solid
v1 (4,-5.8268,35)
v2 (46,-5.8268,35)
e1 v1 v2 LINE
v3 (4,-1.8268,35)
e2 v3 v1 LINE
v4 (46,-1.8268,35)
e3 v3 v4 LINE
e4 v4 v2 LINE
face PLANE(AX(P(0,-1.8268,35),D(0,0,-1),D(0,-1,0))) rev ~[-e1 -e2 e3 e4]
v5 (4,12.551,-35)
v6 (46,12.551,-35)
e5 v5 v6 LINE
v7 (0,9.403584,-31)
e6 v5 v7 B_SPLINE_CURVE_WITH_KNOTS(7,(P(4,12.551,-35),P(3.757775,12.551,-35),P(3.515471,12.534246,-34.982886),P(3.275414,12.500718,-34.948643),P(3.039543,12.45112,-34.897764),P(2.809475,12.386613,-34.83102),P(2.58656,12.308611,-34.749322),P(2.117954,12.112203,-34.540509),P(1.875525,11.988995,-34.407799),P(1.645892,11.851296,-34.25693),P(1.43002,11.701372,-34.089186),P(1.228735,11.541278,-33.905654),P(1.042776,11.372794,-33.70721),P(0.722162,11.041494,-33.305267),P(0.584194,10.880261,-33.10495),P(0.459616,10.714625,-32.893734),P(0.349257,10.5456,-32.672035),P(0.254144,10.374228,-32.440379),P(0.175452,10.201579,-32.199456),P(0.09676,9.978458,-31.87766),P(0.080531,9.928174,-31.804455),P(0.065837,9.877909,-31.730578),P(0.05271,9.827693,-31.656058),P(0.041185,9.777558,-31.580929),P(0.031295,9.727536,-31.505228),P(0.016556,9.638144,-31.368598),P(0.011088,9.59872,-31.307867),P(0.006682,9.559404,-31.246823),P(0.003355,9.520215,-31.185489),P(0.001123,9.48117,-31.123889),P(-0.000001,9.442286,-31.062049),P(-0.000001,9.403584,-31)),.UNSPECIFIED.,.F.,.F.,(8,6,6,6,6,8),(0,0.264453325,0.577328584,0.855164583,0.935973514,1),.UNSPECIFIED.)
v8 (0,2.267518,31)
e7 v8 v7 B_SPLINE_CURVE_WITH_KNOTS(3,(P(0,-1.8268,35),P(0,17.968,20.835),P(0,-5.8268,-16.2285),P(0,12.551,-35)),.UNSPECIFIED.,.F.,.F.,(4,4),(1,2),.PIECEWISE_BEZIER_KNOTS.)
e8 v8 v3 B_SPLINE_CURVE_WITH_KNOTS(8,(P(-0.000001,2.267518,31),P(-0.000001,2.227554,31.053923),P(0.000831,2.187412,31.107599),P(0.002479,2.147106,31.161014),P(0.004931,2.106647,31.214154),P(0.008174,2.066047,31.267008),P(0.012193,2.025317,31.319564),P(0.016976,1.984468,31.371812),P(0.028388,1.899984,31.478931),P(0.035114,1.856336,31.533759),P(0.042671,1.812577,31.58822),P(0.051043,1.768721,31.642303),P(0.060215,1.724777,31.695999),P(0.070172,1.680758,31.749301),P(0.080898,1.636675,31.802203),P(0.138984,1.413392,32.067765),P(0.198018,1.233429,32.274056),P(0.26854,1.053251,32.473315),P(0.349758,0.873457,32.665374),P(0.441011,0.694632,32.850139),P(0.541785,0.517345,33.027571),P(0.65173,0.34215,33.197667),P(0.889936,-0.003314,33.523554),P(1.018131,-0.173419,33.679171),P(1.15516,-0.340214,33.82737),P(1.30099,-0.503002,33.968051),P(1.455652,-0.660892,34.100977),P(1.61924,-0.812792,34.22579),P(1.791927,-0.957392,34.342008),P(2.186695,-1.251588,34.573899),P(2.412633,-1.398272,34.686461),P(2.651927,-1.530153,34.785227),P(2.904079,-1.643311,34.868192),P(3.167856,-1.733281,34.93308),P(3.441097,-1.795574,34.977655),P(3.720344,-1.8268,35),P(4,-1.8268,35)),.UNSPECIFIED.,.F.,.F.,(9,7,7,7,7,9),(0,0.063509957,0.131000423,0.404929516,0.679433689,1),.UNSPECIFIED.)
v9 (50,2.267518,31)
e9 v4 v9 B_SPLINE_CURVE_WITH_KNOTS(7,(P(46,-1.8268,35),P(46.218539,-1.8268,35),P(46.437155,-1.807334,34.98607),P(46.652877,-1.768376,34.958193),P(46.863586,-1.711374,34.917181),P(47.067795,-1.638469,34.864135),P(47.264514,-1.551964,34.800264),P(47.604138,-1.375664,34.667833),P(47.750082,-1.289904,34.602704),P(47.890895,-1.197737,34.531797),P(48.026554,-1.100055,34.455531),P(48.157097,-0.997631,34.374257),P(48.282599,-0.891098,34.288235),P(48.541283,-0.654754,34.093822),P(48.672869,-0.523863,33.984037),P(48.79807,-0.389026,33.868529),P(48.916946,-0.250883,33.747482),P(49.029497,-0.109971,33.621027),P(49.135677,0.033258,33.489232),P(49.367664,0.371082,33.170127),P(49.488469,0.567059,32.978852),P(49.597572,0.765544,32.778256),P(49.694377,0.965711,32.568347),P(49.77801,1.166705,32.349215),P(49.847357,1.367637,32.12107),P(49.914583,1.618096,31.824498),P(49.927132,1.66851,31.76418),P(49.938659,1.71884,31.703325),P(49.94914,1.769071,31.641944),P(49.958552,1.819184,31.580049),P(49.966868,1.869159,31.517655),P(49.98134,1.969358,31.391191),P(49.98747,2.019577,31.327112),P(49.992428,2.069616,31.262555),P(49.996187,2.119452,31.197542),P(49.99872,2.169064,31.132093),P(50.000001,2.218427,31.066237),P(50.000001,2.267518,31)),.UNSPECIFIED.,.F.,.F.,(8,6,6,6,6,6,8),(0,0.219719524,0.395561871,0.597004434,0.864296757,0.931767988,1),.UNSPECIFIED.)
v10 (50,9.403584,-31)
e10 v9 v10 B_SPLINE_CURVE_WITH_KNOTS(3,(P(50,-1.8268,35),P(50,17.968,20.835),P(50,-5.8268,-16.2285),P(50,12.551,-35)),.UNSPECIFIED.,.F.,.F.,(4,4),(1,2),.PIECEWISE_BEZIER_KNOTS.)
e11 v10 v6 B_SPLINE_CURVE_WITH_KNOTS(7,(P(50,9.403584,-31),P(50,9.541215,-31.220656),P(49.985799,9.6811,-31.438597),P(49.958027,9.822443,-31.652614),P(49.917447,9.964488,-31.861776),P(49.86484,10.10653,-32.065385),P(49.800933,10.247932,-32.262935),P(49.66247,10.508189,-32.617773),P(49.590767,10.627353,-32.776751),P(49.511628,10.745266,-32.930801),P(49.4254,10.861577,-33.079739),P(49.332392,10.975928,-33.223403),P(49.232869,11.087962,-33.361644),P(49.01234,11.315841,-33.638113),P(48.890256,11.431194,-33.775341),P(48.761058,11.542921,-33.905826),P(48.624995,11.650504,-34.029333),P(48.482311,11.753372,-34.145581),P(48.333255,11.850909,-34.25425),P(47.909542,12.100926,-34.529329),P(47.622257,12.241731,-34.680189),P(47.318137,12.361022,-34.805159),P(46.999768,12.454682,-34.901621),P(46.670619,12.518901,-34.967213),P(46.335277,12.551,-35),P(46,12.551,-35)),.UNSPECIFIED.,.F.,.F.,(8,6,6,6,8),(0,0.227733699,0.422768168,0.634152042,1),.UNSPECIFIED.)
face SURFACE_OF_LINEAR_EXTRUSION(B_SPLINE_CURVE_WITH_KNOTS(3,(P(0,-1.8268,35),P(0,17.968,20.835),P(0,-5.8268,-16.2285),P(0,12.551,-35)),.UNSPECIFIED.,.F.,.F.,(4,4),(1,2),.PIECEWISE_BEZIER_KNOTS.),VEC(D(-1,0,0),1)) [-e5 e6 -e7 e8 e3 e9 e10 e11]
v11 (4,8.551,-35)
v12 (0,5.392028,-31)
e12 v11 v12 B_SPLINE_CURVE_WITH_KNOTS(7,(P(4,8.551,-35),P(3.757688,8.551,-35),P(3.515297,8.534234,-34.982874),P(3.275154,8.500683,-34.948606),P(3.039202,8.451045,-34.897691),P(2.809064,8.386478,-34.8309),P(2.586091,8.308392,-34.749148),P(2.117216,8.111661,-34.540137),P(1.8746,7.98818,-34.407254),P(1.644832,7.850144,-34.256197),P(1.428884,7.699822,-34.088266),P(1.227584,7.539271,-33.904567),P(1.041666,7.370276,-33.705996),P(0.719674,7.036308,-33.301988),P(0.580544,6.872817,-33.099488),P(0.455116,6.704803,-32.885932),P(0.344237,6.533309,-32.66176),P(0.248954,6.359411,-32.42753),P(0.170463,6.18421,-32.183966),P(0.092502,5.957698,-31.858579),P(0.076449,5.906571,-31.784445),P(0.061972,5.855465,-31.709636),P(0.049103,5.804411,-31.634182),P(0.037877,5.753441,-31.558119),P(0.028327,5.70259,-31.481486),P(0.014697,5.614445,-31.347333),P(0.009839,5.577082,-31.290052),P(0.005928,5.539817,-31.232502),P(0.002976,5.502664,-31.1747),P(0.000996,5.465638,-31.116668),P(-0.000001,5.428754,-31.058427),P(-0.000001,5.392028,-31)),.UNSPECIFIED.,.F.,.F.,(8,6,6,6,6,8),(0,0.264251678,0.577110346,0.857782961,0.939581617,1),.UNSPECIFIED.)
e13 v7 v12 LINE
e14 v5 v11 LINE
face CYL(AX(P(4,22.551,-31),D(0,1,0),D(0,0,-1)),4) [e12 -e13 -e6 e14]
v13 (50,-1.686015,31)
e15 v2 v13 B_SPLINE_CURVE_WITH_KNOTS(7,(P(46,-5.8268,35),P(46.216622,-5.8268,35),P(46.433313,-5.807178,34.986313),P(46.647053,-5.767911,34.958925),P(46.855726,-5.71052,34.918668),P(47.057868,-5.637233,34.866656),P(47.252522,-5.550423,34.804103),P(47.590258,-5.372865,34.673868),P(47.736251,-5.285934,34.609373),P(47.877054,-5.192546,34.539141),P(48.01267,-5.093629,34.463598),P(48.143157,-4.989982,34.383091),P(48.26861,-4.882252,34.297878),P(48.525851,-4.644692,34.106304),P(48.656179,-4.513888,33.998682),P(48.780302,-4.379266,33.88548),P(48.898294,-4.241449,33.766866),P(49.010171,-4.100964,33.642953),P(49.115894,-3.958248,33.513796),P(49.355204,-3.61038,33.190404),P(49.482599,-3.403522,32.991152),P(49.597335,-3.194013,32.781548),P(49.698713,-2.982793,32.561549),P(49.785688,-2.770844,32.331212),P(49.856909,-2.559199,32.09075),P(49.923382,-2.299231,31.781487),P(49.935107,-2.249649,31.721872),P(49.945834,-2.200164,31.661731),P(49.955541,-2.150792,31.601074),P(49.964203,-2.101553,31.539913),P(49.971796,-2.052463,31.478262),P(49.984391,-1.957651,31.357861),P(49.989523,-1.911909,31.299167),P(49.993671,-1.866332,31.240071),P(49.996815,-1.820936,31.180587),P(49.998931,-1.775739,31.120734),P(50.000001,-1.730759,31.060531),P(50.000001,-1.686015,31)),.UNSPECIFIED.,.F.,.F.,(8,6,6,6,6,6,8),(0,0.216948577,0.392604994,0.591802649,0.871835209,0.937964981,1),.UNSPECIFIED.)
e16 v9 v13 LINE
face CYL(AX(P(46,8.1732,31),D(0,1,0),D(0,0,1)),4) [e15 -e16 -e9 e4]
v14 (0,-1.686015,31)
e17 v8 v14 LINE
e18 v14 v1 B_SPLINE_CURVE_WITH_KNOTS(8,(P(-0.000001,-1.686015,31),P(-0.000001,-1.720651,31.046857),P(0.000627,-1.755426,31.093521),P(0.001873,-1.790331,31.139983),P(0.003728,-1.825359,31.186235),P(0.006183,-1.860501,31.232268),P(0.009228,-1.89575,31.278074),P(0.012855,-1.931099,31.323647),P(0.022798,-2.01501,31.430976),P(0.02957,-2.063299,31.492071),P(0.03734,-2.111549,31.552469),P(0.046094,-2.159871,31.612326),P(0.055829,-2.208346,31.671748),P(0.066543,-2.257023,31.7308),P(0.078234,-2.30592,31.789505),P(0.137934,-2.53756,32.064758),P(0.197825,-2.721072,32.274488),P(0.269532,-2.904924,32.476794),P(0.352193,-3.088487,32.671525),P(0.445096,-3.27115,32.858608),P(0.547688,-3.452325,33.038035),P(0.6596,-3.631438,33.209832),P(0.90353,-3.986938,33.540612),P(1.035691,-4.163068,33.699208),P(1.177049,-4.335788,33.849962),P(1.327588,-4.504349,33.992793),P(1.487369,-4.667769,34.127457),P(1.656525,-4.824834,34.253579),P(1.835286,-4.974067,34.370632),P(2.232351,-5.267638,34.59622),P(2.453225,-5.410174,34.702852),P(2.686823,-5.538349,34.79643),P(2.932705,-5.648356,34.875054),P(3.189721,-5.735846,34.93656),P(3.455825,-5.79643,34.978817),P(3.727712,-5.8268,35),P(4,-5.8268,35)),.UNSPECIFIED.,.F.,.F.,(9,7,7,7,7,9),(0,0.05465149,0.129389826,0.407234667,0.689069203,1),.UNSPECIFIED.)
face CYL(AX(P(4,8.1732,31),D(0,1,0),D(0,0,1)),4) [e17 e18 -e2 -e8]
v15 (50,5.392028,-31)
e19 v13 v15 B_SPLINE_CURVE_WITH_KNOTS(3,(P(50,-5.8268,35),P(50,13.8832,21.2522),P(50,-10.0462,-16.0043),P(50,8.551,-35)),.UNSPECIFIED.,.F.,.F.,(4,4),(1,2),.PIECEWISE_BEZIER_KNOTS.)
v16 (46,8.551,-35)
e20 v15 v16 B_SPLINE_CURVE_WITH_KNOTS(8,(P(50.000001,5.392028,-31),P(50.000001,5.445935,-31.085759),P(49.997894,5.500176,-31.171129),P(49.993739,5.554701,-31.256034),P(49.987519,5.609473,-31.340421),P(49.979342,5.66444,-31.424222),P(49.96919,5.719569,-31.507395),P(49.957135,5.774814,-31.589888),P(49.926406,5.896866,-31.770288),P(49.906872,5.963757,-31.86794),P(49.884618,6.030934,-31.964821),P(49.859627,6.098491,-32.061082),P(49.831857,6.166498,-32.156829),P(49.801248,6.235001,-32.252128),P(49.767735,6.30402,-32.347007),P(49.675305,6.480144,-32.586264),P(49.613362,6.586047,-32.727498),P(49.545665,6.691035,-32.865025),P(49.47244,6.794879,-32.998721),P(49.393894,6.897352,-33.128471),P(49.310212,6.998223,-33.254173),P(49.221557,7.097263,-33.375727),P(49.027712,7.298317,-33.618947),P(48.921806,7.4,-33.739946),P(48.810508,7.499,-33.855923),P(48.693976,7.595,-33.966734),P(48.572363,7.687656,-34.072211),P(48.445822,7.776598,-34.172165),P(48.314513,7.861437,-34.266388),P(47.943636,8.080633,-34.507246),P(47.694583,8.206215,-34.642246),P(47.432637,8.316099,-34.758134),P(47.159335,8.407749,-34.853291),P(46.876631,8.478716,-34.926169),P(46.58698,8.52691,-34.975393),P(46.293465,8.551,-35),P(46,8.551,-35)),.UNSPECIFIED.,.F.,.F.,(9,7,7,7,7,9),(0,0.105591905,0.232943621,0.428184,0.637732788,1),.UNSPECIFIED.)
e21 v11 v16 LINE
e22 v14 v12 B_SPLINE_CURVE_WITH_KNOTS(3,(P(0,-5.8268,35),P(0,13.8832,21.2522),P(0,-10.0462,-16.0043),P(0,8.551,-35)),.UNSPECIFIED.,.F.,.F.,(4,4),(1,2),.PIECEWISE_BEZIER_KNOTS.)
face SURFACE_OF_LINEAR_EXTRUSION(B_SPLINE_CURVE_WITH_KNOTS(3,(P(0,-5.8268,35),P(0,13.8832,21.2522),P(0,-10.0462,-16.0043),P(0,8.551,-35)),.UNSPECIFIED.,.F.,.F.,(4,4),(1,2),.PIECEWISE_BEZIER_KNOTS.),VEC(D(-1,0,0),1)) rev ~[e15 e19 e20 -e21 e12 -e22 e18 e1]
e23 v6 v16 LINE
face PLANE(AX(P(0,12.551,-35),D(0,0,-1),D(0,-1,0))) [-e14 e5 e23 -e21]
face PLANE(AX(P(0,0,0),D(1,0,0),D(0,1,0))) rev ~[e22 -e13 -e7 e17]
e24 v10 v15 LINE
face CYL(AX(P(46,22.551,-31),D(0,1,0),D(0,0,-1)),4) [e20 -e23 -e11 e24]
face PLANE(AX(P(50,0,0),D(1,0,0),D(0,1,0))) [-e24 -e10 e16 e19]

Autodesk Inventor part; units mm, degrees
ref_plane "YZ Plane" through (0, 0, 0) normal (1, 0, 0) x (0, 1, 0)
ref_plane "XZ Plane" through (0, 0, 0) normal (0, 1, 0) x (-1, 0, 0)
ref_plane "XY Plane" through (0, 0, 0) normal (0, 0, 1) x (1, 0, 0)
sketch "Sketch2" plane through (0, 0, 0) normal (1, 0, 0) x (0, 1, 0)
  line L0 (-1.8268, 35) -> (17.968, 20.835) construction
  line L1 (17.968, 20.835) -> (-5.8268, -16.2285) construction
  line L2 (-5.8268, -16.2285) -> (12.551, -35) construction
  spline S0 degree 3 poles (-1.8268, 35) (17.968, 20.835) (-5.8268, -16.2285) (12.551, -35) knots 1 1 1 1 2 2 2 2
  line L3 (43.3052, 0) -> (-43.3052, 0) construction
  line L4 (0, 65.4619) -> (0, -65.4619) construction
  line L5 (12.551, -35) -> (8.551, -35)
  line L6 (-5.8268, 35) -> (13.8832, 21.2522) construction
  line L7 (13.8832, 21.2522) -> (-10.0462, -16.0043) construction
  line L8 (-10.0462, -16.0043) -> (8.551, -35) construction
  spline S1 degree 3 poles (-5.8268, 35) (13.8832, 21.2522) (-10.0462, -16.0043) (8.551, -35) knots 1 1 1 1 2 2 2 2
  line L9 (-1.8268, 35) -> (-5.8268, 35)
  point P0 (0, 0)
  point P1 (0, 0)
  point P2 (0, 0)
  dimension "d0" = 70
  dimension "d1" = 35
  dimension "d3" = 4
  dimension "d4" = 4
extrude "Extrusion1" add sketch "Sketch2" along normal blind 50
fillet "Fillet1" radius 4 4 edges at (50, -3.8268, 35) (0, -3.8268, 35) (50, 10.551, -35) (0, 10.551, -35)
equation "\"d4\" = d3"
properties part number "Case Top"
